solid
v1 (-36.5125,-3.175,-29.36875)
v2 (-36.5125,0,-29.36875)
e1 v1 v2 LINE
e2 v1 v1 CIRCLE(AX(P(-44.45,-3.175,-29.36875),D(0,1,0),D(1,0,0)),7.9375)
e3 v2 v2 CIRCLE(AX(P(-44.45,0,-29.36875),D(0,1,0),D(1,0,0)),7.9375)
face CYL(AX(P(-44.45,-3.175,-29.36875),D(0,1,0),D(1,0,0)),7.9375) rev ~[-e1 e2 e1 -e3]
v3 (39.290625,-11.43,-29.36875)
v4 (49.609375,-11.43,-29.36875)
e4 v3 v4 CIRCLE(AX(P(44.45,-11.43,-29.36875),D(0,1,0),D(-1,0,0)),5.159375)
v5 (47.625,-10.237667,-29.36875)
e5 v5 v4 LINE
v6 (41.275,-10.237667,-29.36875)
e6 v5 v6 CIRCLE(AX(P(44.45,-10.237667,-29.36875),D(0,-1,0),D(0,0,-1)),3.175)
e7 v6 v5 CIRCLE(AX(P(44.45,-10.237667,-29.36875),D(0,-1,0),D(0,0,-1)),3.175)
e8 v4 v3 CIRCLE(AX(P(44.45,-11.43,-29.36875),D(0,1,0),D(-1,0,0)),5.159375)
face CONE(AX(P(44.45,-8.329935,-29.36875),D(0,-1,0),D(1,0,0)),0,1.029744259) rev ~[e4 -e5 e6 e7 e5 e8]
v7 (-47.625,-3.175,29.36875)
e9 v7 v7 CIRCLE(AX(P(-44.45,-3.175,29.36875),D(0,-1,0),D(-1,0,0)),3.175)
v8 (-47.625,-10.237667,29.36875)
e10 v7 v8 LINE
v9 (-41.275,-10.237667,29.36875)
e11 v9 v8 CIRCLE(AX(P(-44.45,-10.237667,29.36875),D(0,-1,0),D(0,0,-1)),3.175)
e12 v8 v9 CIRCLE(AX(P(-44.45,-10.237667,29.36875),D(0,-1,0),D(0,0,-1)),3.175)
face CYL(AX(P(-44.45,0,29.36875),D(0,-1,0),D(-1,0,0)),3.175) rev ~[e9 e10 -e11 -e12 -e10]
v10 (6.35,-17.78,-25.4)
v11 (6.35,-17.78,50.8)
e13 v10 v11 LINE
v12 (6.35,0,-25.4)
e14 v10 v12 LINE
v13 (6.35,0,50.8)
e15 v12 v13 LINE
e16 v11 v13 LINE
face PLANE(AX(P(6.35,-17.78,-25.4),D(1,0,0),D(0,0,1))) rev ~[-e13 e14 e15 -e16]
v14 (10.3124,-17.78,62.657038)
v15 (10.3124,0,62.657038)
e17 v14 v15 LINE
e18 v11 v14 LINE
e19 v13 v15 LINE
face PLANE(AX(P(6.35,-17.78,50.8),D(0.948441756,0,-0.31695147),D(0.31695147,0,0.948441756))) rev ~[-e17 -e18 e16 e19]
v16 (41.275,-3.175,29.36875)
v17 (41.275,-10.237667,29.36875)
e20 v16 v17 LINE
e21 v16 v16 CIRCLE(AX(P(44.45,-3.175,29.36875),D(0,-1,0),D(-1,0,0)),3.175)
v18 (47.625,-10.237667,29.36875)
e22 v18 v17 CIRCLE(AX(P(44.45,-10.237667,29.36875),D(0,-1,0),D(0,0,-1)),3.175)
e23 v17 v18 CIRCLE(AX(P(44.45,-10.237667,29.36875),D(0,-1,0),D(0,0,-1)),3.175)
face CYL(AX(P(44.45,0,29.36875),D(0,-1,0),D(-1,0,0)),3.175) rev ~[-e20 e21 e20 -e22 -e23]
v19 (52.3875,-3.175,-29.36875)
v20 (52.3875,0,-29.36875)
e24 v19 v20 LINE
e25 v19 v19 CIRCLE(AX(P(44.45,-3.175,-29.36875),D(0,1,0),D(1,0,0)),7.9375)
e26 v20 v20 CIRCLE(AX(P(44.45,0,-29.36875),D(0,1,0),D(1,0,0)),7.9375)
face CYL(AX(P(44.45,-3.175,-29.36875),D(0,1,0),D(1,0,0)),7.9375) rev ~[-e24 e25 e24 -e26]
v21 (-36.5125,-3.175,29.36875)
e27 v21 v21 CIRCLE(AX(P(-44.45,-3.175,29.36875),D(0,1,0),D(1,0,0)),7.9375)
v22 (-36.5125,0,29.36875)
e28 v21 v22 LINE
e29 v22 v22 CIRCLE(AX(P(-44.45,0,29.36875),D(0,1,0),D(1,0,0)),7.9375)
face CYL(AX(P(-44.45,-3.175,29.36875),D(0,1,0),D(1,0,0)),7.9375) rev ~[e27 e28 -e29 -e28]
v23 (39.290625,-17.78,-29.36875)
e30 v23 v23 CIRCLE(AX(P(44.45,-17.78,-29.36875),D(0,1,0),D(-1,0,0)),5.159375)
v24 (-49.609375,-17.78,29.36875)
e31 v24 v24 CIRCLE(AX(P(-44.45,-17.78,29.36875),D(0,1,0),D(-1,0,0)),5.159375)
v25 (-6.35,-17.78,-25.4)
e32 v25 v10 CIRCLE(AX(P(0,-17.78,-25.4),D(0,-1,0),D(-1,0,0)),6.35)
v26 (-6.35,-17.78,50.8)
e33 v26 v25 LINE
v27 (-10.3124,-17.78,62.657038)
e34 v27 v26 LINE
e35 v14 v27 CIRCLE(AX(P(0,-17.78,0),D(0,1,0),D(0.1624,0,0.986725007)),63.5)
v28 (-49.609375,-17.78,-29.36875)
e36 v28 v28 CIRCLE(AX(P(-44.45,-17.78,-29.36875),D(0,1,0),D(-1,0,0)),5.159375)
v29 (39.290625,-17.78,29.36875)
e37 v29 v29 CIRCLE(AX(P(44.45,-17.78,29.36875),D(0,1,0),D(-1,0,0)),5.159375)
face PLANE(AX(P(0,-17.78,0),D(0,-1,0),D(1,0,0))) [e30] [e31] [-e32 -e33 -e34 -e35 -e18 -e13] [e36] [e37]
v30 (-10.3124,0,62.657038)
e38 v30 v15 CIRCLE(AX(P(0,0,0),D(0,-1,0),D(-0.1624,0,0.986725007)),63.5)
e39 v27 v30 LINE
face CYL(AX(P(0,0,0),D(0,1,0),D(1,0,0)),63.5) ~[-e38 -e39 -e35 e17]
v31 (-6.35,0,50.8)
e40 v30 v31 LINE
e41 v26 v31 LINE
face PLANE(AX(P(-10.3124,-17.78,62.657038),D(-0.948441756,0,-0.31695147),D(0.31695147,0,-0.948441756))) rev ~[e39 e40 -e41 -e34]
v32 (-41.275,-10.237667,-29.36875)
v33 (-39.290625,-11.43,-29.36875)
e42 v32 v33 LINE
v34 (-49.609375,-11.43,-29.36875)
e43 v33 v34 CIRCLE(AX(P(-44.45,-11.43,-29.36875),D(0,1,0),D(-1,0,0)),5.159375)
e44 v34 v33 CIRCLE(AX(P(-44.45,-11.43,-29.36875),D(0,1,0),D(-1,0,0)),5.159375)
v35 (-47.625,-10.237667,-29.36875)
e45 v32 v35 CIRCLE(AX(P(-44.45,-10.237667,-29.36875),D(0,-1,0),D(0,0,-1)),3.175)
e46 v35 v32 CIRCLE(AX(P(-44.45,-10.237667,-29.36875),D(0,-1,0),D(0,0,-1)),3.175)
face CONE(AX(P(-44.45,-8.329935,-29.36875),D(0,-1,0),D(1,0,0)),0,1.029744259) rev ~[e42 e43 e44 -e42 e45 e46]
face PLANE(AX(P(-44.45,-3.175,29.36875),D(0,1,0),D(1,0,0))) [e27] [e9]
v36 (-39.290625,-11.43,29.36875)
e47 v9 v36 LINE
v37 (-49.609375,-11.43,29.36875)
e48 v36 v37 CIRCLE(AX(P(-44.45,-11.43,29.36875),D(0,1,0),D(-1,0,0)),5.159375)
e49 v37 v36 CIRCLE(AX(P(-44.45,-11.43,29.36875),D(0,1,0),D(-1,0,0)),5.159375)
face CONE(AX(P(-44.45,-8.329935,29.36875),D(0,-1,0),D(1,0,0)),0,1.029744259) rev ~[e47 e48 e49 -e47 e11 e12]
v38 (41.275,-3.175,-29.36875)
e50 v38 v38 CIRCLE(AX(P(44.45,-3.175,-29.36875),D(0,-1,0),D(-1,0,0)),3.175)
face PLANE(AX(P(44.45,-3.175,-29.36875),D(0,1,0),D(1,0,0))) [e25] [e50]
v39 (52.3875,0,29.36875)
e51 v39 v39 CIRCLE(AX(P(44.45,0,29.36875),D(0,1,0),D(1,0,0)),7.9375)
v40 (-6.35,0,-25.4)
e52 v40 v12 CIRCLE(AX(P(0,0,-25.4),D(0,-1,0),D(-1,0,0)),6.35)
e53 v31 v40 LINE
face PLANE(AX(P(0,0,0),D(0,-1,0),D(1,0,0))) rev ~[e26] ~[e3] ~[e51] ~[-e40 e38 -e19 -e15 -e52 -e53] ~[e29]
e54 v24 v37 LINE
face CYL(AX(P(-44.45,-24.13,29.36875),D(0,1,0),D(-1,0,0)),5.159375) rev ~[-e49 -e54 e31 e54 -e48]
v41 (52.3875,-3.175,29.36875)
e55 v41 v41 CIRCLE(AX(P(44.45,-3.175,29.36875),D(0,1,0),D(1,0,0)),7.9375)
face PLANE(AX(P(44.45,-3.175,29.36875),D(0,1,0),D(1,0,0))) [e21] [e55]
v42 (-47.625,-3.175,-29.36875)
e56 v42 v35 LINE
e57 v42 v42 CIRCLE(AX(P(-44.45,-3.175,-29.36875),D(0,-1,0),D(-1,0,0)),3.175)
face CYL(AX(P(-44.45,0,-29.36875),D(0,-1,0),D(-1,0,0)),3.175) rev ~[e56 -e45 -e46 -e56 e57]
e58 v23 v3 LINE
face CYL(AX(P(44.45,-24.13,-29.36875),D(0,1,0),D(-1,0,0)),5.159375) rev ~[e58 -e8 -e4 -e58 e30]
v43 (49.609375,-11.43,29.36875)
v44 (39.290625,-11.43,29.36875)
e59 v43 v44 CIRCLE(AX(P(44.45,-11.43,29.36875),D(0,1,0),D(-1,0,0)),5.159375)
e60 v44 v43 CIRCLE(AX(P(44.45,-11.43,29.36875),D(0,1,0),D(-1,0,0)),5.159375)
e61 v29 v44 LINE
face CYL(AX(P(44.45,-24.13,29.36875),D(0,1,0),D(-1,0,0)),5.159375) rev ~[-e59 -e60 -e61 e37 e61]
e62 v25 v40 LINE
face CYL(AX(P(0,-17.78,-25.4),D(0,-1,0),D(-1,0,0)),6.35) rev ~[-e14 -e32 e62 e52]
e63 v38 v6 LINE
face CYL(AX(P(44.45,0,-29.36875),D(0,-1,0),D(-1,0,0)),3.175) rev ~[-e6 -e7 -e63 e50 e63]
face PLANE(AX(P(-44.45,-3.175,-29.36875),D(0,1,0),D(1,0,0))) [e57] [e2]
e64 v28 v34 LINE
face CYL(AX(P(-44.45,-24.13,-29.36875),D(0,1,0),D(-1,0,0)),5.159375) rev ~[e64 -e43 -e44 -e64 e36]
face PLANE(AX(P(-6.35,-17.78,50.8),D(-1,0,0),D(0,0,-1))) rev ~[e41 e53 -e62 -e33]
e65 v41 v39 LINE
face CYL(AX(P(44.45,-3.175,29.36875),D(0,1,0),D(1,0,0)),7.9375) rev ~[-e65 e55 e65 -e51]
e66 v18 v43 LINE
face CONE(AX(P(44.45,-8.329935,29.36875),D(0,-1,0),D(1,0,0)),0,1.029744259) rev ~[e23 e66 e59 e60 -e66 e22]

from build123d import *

# Parameters (mm, degrees)
F0_R           = 63.5
F1_DEPTH       = 17.78
F2_D           = 6.35
F2_CBORE_D     = 15.875
F2_CBORE_DEPTH = 3.175
F4_D           = 10.31875
F4_DEPTH       = 6.35
F4_TIP         = 3.1000652563
F6_DEPTH       = 25.4


# Not quite as in the source:
# - a length typed as a fraction of an inch, garbled in the dataset ("3 / 203.2 mm" for 3/8 in), is restored
# - a feature names something its author has since deleted; it is built from what else it names


with BuildPart() as f1:
    # F0 (on Front) → F1 (new body)
    with BuildSketch(Plane.XZ):
        Circle(F0_R)
    extrude(amount=F1_DEPTH)

    # F2 (through all)
    with Locations(Plane(origin=(0, 0, 0), x_dir=(1, 0, 0), z_dir=(0, 1, 0))):
        with Locations((44.45, -29.36875), (-44.45, -29.36875), (-44.45, 29.36875), (44.45, 29.36875)):
            CounterBoreHole(F2_D / 2, F2_CBORE_D / 2, F2_CBORE_DEPTH)

    # F4
    with Locations(Plane.XZ.offset(17.78)):
        with Locations((-44.45, 29.36875), (44.45, 29.36875), (44.45, -29.36875), (-44.45, -29.36875)):
            Hole(F4_D / 2, depth=F4_DEPTH)
            with Locations((0, 0, -(F4_DEPTH + F4_TIP / 2))):  # 118° drill point
                Cone(0, F4_D / 2, F4_TIP, mode=Mode.SUBTRACT)

    # F5 (on face) → F6 (cut)
    with BuildSketch(Plane.XZ.offset(17.78)):
        with BuildLine():
            Line((-10.3124, 62.6570379625), (-6.35, 50.8))
            Line((-6.35, 50.8), (-6.35, -25.4))
            ThreePointArc((-6.35, -25.4), (0, -31.75), (6.35, -25.4))
            Line((6.35, -25.4), (6.35, 50.8))
            Line((6.35, 50.8), (10.3124, 62.6570379625))
            ThreePointArc((10.3124, 62.6570379625), (0, 63.5), (-10.3124, 62.6570379625))
        make_face()
    extrude(amount=-F6_DEPTH, mode=Mode.SUBTRACT)


solid = f1.part
